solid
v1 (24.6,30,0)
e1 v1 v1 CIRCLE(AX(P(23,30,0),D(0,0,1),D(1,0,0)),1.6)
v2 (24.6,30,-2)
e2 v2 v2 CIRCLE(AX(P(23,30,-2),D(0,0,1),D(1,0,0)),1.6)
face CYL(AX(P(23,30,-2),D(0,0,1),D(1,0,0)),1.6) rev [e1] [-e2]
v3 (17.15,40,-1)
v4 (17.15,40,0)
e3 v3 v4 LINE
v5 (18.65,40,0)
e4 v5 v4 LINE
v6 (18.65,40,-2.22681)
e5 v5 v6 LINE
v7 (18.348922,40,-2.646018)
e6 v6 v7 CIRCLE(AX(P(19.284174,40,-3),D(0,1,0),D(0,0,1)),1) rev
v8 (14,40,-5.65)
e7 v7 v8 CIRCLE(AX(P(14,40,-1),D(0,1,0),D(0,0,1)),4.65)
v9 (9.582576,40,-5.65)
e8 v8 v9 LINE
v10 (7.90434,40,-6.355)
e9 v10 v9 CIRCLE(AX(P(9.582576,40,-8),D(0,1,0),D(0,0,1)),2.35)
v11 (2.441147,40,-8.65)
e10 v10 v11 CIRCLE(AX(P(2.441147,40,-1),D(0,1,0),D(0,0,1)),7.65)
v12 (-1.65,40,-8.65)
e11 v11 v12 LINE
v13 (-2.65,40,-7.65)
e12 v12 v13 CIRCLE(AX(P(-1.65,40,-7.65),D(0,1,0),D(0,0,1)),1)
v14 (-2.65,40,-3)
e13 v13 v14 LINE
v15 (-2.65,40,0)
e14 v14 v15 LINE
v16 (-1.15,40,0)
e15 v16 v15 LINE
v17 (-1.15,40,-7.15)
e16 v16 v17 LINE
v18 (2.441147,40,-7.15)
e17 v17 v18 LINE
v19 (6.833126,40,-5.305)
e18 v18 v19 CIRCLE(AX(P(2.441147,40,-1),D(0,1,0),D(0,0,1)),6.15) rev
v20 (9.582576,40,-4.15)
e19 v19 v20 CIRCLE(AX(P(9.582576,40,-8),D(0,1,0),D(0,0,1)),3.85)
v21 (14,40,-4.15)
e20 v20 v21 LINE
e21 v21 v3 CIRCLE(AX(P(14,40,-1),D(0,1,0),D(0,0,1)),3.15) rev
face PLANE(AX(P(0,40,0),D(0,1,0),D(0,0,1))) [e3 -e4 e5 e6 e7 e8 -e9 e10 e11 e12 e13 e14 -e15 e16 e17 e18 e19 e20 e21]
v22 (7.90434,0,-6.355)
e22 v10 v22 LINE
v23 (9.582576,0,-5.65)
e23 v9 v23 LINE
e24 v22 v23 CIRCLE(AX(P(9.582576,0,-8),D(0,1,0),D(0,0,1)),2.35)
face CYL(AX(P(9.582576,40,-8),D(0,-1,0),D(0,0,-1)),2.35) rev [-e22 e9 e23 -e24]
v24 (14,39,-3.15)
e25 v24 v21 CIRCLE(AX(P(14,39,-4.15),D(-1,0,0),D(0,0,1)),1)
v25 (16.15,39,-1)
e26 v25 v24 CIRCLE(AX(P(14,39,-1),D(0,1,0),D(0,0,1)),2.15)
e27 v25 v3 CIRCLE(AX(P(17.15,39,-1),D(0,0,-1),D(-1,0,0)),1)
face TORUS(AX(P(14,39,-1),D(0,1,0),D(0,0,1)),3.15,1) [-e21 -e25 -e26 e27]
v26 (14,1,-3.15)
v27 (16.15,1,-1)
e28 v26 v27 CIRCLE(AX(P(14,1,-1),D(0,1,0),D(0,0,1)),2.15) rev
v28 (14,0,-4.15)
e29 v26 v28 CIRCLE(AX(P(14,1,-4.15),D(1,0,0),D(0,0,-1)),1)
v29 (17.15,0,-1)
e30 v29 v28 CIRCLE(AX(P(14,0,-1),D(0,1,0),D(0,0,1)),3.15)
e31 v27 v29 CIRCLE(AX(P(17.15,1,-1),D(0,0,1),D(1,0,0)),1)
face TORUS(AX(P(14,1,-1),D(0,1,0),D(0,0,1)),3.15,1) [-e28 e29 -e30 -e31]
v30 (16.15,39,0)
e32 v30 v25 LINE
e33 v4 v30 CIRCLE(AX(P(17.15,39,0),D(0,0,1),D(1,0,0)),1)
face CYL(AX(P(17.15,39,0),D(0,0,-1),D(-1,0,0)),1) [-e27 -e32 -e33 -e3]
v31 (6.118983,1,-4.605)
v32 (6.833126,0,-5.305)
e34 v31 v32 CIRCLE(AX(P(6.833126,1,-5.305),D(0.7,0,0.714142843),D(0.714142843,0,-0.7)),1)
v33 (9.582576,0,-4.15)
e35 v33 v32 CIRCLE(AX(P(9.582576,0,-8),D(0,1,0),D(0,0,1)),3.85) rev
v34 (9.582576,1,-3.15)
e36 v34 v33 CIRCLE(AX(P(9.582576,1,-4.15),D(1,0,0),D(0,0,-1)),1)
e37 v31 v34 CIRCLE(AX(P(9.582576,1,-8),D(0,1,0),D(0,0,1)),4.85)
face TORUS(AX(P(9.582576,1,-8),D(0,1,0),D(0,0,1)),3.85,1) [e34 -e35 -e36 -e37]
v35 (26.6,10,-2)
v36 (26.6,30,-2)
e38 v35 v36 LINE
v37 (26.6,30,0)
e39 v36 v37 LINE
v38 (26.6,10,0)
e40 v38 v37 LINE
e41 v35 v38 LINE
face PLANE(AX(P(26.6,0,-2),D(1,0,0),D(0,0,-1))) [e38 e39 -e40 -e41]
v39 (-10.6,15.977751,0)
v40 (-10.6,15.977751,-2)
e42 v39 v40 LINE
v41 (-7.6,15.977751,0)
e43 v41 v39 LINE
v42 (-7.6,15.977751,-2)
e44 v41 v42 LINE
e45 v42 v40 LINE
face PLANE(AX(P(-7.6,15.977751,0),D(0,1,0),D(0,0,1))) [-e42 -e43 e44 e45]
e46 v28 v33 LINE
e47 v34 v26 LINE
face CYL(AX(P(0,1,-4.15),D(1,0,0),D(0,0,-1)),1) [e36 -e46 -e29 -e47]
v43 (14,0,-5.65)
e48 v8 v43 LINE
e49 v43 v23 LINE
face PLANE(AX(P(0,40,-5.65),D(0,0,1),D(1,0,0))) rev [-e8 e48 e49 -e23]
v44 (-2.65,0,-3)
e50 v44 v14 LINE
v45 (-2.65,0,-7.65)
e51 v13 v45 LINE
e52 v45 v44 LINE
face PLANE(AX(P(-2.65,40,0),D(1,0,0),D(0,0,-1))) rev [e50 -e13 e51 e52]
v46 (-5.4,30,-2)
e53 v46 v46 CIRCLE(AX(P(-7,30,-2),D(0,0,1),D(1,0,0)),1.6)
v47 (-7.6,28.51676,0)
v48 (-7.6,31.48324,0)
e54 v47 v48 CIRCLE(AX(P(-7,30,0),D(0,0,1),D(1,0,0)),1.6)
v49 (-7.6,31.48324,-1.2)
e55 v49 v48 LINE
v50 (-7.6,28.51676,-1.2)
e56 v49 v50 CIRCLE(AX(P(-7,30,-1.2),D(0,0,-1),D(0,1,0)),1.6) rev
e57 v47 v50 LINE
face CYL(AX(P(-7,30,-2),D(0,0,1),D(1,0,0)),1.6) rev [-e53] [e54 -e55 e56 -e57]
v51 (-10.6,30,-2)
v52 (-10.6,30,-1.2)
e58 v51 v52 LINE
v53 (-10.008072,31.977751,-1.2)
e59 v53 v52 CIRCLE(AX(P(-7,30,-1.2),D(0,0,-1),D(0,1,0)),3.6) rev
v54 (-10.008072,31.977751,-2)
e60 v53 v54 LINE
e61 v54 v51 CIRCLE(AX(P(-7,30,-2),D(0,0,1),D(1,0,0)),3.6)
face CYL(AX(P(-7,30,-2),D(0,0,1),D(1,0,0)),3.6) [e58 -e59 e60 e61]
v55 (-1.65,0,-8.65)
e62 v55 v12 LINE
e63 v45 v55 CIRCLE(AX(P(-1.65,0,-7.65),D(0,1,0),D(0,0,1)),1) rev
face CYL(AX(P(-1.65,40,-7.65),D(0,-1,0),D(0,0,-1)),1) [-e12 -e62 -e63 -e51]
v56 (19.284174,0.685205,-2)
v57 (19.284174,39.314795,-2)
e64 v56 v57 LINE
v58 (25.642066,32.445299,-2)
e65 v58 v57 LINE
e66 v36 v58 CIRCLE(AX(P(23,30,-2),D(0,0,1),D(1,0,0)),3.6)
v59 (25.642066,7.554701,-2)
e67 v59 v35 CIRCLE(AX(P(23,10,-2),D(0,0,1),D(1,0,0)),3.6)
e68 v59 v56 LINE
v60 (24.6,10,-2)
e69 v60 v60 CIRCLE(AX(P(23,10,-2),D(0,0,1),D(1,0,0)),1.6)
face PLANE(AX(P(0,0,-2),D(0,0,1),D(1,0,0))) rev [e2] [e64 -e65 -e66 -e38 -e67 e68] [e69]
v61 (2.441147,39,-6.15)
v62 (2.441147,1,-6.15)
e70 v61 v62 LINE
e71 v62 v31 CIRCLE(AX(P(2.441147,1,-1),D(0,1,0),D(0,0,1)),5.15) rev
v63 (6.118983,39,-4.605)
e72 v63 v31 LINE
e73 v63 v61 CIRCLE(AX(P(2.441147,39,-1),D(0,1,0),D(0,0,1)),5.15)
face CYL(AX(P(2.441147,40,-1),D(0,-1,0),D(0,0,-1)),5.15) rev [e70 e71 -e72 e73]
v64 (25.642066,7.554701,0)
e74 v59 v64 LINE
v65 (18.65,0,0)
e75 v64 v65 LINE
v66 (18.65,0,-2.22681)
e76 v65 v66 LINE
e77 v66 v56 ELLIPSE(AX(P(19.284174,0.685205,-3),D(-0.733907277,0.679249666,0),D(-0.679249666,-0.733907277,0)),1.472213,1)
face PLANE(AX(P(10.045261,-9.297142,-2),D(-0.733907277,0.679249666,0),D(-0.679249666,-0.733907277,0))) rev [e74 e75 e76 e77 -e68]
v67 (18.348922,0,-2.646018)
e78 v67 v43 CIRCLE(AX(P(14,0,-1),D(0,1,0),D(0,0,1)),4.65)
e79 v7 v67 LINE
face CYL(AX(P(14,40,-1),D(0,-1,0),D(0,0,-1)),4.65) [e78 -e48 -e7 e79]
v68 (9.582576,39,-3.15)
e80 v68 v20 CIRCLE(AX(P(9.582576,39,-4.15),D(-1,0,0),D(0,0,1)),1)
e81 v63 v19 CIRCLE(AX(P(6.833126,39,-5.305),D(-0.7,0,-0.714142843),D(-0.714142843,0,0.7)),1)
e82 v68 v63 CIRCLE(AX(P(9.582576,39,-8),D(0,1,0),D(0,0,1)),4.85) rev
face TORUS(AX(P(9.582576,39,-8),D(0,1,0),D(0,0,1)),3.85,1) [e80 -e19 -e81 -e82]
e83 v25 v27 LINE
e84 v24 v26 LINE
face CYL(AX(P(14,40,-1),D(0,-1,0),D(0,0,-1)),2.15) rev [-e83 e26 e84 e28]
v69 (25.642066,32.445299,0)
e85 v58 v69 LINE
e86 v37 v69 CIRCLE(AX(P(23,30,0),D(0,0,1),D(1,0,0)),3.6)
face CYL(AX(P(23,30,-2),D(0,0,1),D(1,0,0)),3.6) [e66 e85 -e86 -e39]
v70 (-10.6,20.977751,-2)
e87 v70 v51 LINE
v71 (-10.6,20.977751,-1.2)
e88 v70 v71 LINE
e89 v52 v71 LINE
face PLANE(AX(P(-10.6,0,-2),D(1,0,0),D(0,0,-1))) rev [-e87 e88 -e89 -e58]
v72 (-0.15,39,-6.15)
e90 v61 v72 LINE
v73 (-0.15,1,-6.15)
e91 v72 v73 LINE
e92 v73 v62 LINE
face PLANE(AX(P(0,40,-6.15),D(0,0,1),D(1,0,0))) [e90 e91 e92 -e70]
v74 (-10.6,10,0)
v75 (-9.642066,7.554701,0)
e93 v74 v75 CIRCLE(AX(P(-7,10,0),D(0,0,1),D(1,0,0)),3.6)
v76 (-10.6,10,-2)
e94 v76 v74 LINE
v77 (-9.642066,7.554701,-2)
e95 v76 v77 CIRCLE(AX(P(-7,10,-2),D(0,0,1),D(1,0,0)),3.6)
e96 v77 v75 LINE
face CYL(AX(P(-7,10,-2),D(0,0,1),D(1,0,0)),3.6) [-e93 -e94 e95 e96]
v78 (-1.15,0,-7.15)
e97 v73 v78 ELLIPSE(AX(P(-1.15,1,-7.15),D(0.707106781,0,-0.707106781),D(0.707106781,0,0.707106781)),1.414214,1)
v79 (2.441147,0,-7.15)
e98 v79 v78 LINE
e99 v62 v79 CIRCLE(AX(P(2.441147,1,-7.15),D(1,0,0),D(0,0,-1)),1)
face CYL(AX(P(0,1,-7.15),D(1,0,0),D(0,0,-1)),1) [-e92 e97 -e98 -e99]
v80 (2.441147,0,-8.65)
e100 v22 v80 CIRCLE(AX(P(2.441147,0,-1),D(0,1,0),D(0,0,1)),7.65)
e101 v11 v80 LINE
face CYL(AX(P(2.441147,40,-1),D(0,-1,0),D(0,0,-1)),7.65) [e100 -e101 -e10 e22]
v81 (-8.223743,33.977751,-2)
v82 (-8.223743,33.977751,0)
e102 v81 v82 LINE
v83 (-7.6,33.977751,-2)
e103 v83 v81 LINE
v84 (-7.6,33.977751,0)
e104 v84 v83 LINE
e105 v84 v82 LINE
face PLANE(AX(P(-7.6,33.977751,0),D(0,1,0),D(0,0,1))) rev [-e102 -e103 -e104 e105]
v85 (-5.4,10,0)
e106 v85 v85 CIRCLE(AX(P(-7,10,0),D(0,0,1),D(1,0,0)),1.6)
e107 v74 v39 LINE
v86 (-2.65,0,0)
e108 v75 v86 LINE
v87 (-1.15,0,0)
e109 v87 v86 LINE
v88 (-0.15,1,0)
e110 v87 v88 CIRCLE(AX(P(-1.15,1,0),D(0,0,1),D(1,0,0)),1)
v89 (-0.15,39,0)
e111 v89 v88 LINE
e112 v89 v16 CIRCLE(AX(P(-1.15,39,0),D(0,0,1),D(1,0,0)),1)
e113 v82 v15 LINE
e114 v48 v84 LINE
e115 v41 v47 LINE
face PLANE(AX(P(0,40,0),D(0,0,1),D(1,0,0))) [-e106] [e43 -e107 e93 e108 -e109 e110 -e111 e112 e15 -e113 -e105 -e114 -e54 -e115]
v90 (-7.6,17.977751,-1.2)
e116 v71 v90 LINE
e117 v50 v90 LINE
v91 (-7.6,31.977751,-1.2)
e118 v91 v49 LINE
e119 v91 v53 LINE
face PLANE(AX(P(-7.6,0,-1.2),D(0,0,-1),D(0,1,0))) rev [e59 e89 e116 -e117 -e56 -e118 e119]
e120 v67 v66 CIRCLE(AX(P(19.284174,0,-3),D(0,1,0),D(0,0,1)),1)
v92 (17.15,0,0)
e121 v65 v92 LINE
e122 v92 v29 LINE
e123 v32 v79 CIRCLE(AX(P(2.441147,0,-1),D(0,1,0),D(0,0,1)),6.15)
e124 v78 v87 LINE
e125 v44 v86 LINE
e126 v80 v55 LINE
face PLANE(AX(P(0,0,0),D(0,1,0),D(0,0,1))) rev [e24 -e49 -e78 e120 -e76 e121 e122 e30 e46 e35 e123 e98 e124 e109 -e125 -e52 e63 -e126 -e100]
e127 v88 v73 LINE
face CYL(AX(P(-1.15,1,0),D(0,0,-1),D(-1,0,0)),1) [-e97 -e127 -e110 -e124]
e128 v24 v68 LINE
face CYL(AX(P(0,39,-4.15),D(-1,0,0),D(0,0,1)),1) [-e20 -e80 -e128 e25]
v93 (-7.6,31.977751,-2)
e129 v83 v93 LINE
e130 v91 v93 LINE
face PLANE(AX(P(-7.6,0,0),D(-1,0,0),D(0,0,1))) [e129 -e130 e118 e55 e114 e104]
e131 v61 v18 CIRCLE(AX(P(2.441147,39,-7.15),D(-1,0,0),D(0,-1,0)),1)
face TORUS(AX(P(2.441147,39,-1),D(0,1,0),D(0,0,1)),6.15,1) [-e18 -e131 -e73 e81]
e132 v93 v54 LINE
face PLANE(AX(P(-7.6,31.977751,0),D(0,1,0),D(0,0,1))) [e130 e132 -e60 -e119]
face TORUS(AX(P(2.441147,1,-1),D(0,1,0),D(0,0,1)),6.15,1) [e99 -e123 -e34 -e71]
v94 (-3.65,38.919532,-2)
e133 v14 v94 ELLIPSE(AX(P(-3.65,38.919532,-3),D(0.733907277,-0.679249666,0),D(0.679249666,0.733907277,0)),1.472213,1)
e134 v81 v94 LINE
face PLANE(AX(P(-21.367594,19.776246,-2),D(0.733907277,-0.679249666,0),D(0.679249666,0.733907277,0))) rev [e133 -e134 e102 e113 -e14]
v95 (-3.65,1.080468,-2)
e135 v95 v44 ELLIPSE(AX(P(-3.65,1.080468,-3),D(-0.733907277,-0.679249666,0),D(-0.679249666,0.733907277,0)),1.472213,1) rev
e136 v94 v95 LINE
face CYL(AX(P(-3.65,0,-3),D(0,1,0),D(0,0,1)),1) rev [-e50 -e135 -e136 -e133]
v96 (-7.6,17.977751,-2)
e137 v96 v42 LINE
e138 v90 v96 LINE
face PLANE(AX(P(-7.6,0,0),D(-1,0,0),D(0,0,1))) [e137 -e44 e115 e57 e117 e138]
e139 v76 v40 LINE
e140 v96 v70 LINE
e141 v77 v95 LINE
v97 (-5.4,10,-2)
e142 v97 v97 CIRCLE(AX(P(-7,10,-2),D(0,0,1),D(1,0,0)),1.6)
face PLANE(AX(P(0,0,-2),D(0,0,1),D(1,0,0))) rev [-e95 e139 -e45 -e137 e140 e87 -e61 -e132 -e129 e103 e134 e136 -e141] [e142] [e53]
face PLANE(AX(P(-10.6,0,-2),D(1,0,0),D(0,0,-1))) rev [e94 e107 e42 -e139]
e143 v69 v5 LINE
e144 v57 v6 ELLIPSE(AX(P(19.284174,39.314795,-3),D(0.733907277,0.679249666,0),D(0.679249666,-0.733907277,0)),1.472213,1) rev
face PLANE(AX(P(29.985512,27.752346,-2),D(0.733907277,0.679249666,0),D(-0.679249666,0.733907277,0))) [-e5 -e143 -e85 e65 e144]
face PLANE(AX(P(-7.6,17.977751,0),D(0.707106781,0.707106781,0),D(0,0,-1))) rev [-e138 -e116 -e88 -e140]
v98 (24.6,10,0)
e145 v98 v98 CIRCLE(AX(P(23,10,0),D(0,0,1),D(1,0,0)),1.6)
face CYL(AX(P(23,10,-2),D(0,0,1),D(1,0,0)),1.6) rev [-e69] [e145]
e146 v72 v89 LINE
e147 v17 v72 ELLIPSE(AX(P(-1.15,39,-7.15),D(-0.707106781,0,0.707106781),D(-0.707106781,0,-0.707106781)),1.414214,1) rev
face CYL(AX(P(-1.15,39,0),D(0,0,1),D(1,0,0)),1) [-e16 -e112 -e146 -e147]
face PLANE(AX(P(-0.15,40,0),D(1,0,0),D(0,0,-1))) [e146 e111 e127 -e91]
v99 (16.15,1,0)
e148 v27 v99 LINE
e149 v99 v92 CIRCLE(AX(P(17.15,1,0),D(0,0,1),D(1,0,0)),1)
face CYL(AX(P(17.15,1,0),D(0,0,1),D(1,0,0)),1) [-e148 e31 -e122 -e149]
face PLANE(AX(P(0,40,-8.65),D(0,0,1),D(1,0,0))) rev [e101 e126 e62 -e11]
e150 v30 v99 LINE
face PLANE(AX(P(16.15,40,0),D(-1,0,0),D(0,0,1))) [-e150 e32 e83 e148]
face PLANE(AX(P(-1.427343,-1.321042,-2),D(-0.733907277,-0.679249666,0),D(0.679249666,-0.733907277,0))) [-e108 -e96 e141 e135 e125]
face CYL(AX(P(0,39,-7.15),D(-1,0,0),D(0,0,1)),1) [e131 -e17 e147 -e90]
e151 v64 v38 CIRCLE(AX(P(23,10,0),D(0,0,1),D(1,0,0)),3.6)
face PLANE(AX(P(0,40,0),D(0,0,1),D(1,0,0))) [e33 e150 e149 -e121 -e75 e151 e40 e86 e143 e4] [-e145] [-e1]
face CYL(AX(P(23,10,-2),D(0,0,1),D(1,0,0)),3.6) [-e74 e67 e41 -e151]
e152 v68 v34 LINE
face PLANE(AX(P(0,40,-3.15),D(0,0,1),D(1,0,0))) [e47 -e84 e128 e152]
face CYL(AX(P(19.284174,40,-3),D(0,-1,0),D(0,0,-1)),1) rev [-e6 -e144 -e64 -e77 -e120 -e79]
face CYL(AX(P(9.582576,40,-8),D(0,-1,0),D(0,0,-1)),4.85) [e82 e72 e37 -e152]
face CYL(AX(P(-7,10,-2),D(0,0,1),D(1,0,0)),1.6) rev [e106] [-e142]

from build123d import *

# Parameters (mm, degrees)
BOSS_EXTRUDE1_DEPTH     = 40
BOSS_EXTRUDE2_START     = -2
BOSS_EXTRUDE2_OUTLINE_R = 1.6
BOSS_EXTRUDE2_DEPTH     = 2
FILLET1_R               = 1
FILLET2_R               = 1
SKETCH3_W               = 1.2
SKETCH3_H               = 2
SKETCH3_W_2             = 23.413110463
SKETCH3_H_2             = 14
CUT_EXTRUDE1_DEPTH      = 3
CHAMFER1_SIZE           = 3


# Read off the part's stored shape, not the designer's step: Boss-Extrude2
with BuildPart() as part:
    # Sketch1 → Boss-Extrude1 (new body)
    with BuildSketch(Plane(origin=(0, 0, 0), x_dir=(1, 0, 0), z_dir=(0, 1, 0))):
        with BuildLine():
            ThreePointArc((7.904340014, 6.355), (8.672424609, 5.833407053), (9.582575695, 5.65))
            Line((9.582575695, 5.65), (14, 5.65))
            ThreePointArc((14, 5.65), (17.288046533, 4.288046533), (18.65, 1))
            Line((18.65, 1), (18.65, 0))
            Line((18.65, 0), (16.15, 0))
            Line((16.15, 0), (16.15, 1))
            ThreePointArc((16.15, 1), (15.52027958, 2.52027958), (14, 3.15))
            Line((14, 3.15), (9.582575695, 3.15))
            ThreePointArc((9.582575695, 3.15), (7.704178772, 3.528520938), (6.118982907, 4.605))
            ThreePointArc((6.118982907, 4.605), (4.43573369, 5.748065396), (2.441147266, 6.15))
            Line((2.441147266, 6.15), (-0.15, 6.15))
            Line((-0.15, 6.15), (-0.15, 0))
            Line((-0.15, 0), (-2.65, 0))
            Line((-2.65, 0), (-2.65, 8.65))
            Line((-2.65, 8.65), (2.441147266, 8.65))
            ThreePointArc((2.441147266, 8.65), (5.403979526, 8.05295151), (7.904340014, 6.355))
        make_face()
    extrude(amount=BOSS_EXTRUDE1_DEPTH)

    # Boss-Extrude2 outline → Boss-Extrude2 (add)
    # profile 1 of 2: a face of its own
    with BuildSketch(Plane.XY.offset(BOSS_EXTRUDE2_START)):
        with BuildLine():
            Line((-2.65, 40), (-9.642066198, 32.445298796))
            ThreePointArc((-9.642066198, 32.445298796), (-10.351972428, 31.313118747), (-10.6, 30))
            Line((-10.6, 30), (-10.6, 10))
            ThreePointArc((-10.6, 10), (-10.351972428, 8.686881253), (-9.642066198, 7.554701204))
            Line((-9.642066198, 7.554701204), (-2.65, 0))
            Line((-2.65, 0), (-2.65, 40))
        make_face()
        with Locations((-7, 10)):
            Circle(BOSS_EXTRUDE2_OUTLINE_R, mode=Mode.SUBTRACT)
        with Locations((-7, 30)):
            Circle(BOSS_EXTRUDE2_OUTLINE_R, mode=Mode.SUBTRACT)
    # profile 2 of 2: a face of its own
    with BuildSketch(Plane.XY.offset(BOSS_EXTRUDE2_START)):
        with BuildLine():
            Line((26.6, 10), (26.6, 30))
            ThreePointArc((26.6, 30), (26.351972428, 31.313118747), (25.642066198, 32.445298796))
            Line((25.642066198, 32.445298796), (18.65, 40))
            Line((18.65, 40), (16.15, 40))
            Line((16.15, 40), (16.15, 0))
            Line((16.15, 0), (18.65, 0))
            Line((18.65, 0), (25.642066198, 7.554701204))
            ThreePointArc((25.642066198, 7.554701204), (26.351972428, 8.686881253), (26.6, 10))
        make_face()
        with Locations((23, 30)):
            Circle(BOSS_EXTRUDE2_OUTLINE_R, mode=Mode.SUBTRACT)
        with Locations((23, 10)):
            Circle(BOSS_EXTRUDE2_OUTLINE_R, mode=Mode.SUBTRACT)
    extrude(amount=BOSS_EXTRUDE2_DEPTH)

    # Fillet1
    fillet1_edges = [part.edges().sort_by_distance(p)[0] for p in [
        (-2.65, 20, -2),
        (-2.65, 20, -8.65),
        (18.541200282, 20, -2),
    ]]
    fillet(fillet1_edges, radius=FILLET1_R)

    # Fillet2
    fillet2_edges = [part.edges().sort_by_distance(p)[0] for p in [
        (16.15, 0, -0.5),
        (15.52027958, 0, -2.52027958),
        (11.791287847, 0, -3.15),
        (7.704178772, 0, -3.528520938),
        (4.43573369, 0, -5.748065396),
        (1.145573633, 0, -6.15),
        (-0.15, 0, -3.075),
        (-0.15, 40, -3.075),
        (1.145573633, 40, -6.15),
        (4.43573369, 40, -5.748065396),
        (7.704178772, 40, -3.528520938),
        (11.791287847, 40, -3.15),
        (15.52027958, 40, -2.52027958),
        (16.15, 40, -0.5),
    ]]
    fillet(fillet2_edges, radius=FILLET2_R)

    # Sketch3 → Cut-Extrude1 (cut)
    with BuildSketch(Plane.ZY.offset(10.6)):
        with Locations((-0.6, 32.977751257)):
            Rectangle(SKETCH3_W, SKETCH3_H)
        with Locations((-12.906555232, 32.977751257)):
            Rectangle(SKETCH3_W_2, SKETCH3_H)
        with Locations((-0.6, 24.977751257)):
            Rectangle(SKETCH3_W, SKETCH3_H_2)
        Polygon((0, 15.977751257), (0, 17.977751257), (-1.2, 17.977751257), (-15.374287906, 17.977751257), (-15.374287906, 15.977751257), align=None)
    extrude(amount=-CUT_EXTRUDE1_DEPTH, mode=Mode.SUBTRACT)

    # Chamfer1
    chamfer1_edges = [part.edges().sort_by_distance(p)[0] for p in [
        (-10.6, 17.977751257, -1.6),
    ]]
    chamfer(chamfer1_edges, length=CHAMFER1_SIZE - 0.0001)  # a hair under: the kernel refuses the full size


solid = part.part
